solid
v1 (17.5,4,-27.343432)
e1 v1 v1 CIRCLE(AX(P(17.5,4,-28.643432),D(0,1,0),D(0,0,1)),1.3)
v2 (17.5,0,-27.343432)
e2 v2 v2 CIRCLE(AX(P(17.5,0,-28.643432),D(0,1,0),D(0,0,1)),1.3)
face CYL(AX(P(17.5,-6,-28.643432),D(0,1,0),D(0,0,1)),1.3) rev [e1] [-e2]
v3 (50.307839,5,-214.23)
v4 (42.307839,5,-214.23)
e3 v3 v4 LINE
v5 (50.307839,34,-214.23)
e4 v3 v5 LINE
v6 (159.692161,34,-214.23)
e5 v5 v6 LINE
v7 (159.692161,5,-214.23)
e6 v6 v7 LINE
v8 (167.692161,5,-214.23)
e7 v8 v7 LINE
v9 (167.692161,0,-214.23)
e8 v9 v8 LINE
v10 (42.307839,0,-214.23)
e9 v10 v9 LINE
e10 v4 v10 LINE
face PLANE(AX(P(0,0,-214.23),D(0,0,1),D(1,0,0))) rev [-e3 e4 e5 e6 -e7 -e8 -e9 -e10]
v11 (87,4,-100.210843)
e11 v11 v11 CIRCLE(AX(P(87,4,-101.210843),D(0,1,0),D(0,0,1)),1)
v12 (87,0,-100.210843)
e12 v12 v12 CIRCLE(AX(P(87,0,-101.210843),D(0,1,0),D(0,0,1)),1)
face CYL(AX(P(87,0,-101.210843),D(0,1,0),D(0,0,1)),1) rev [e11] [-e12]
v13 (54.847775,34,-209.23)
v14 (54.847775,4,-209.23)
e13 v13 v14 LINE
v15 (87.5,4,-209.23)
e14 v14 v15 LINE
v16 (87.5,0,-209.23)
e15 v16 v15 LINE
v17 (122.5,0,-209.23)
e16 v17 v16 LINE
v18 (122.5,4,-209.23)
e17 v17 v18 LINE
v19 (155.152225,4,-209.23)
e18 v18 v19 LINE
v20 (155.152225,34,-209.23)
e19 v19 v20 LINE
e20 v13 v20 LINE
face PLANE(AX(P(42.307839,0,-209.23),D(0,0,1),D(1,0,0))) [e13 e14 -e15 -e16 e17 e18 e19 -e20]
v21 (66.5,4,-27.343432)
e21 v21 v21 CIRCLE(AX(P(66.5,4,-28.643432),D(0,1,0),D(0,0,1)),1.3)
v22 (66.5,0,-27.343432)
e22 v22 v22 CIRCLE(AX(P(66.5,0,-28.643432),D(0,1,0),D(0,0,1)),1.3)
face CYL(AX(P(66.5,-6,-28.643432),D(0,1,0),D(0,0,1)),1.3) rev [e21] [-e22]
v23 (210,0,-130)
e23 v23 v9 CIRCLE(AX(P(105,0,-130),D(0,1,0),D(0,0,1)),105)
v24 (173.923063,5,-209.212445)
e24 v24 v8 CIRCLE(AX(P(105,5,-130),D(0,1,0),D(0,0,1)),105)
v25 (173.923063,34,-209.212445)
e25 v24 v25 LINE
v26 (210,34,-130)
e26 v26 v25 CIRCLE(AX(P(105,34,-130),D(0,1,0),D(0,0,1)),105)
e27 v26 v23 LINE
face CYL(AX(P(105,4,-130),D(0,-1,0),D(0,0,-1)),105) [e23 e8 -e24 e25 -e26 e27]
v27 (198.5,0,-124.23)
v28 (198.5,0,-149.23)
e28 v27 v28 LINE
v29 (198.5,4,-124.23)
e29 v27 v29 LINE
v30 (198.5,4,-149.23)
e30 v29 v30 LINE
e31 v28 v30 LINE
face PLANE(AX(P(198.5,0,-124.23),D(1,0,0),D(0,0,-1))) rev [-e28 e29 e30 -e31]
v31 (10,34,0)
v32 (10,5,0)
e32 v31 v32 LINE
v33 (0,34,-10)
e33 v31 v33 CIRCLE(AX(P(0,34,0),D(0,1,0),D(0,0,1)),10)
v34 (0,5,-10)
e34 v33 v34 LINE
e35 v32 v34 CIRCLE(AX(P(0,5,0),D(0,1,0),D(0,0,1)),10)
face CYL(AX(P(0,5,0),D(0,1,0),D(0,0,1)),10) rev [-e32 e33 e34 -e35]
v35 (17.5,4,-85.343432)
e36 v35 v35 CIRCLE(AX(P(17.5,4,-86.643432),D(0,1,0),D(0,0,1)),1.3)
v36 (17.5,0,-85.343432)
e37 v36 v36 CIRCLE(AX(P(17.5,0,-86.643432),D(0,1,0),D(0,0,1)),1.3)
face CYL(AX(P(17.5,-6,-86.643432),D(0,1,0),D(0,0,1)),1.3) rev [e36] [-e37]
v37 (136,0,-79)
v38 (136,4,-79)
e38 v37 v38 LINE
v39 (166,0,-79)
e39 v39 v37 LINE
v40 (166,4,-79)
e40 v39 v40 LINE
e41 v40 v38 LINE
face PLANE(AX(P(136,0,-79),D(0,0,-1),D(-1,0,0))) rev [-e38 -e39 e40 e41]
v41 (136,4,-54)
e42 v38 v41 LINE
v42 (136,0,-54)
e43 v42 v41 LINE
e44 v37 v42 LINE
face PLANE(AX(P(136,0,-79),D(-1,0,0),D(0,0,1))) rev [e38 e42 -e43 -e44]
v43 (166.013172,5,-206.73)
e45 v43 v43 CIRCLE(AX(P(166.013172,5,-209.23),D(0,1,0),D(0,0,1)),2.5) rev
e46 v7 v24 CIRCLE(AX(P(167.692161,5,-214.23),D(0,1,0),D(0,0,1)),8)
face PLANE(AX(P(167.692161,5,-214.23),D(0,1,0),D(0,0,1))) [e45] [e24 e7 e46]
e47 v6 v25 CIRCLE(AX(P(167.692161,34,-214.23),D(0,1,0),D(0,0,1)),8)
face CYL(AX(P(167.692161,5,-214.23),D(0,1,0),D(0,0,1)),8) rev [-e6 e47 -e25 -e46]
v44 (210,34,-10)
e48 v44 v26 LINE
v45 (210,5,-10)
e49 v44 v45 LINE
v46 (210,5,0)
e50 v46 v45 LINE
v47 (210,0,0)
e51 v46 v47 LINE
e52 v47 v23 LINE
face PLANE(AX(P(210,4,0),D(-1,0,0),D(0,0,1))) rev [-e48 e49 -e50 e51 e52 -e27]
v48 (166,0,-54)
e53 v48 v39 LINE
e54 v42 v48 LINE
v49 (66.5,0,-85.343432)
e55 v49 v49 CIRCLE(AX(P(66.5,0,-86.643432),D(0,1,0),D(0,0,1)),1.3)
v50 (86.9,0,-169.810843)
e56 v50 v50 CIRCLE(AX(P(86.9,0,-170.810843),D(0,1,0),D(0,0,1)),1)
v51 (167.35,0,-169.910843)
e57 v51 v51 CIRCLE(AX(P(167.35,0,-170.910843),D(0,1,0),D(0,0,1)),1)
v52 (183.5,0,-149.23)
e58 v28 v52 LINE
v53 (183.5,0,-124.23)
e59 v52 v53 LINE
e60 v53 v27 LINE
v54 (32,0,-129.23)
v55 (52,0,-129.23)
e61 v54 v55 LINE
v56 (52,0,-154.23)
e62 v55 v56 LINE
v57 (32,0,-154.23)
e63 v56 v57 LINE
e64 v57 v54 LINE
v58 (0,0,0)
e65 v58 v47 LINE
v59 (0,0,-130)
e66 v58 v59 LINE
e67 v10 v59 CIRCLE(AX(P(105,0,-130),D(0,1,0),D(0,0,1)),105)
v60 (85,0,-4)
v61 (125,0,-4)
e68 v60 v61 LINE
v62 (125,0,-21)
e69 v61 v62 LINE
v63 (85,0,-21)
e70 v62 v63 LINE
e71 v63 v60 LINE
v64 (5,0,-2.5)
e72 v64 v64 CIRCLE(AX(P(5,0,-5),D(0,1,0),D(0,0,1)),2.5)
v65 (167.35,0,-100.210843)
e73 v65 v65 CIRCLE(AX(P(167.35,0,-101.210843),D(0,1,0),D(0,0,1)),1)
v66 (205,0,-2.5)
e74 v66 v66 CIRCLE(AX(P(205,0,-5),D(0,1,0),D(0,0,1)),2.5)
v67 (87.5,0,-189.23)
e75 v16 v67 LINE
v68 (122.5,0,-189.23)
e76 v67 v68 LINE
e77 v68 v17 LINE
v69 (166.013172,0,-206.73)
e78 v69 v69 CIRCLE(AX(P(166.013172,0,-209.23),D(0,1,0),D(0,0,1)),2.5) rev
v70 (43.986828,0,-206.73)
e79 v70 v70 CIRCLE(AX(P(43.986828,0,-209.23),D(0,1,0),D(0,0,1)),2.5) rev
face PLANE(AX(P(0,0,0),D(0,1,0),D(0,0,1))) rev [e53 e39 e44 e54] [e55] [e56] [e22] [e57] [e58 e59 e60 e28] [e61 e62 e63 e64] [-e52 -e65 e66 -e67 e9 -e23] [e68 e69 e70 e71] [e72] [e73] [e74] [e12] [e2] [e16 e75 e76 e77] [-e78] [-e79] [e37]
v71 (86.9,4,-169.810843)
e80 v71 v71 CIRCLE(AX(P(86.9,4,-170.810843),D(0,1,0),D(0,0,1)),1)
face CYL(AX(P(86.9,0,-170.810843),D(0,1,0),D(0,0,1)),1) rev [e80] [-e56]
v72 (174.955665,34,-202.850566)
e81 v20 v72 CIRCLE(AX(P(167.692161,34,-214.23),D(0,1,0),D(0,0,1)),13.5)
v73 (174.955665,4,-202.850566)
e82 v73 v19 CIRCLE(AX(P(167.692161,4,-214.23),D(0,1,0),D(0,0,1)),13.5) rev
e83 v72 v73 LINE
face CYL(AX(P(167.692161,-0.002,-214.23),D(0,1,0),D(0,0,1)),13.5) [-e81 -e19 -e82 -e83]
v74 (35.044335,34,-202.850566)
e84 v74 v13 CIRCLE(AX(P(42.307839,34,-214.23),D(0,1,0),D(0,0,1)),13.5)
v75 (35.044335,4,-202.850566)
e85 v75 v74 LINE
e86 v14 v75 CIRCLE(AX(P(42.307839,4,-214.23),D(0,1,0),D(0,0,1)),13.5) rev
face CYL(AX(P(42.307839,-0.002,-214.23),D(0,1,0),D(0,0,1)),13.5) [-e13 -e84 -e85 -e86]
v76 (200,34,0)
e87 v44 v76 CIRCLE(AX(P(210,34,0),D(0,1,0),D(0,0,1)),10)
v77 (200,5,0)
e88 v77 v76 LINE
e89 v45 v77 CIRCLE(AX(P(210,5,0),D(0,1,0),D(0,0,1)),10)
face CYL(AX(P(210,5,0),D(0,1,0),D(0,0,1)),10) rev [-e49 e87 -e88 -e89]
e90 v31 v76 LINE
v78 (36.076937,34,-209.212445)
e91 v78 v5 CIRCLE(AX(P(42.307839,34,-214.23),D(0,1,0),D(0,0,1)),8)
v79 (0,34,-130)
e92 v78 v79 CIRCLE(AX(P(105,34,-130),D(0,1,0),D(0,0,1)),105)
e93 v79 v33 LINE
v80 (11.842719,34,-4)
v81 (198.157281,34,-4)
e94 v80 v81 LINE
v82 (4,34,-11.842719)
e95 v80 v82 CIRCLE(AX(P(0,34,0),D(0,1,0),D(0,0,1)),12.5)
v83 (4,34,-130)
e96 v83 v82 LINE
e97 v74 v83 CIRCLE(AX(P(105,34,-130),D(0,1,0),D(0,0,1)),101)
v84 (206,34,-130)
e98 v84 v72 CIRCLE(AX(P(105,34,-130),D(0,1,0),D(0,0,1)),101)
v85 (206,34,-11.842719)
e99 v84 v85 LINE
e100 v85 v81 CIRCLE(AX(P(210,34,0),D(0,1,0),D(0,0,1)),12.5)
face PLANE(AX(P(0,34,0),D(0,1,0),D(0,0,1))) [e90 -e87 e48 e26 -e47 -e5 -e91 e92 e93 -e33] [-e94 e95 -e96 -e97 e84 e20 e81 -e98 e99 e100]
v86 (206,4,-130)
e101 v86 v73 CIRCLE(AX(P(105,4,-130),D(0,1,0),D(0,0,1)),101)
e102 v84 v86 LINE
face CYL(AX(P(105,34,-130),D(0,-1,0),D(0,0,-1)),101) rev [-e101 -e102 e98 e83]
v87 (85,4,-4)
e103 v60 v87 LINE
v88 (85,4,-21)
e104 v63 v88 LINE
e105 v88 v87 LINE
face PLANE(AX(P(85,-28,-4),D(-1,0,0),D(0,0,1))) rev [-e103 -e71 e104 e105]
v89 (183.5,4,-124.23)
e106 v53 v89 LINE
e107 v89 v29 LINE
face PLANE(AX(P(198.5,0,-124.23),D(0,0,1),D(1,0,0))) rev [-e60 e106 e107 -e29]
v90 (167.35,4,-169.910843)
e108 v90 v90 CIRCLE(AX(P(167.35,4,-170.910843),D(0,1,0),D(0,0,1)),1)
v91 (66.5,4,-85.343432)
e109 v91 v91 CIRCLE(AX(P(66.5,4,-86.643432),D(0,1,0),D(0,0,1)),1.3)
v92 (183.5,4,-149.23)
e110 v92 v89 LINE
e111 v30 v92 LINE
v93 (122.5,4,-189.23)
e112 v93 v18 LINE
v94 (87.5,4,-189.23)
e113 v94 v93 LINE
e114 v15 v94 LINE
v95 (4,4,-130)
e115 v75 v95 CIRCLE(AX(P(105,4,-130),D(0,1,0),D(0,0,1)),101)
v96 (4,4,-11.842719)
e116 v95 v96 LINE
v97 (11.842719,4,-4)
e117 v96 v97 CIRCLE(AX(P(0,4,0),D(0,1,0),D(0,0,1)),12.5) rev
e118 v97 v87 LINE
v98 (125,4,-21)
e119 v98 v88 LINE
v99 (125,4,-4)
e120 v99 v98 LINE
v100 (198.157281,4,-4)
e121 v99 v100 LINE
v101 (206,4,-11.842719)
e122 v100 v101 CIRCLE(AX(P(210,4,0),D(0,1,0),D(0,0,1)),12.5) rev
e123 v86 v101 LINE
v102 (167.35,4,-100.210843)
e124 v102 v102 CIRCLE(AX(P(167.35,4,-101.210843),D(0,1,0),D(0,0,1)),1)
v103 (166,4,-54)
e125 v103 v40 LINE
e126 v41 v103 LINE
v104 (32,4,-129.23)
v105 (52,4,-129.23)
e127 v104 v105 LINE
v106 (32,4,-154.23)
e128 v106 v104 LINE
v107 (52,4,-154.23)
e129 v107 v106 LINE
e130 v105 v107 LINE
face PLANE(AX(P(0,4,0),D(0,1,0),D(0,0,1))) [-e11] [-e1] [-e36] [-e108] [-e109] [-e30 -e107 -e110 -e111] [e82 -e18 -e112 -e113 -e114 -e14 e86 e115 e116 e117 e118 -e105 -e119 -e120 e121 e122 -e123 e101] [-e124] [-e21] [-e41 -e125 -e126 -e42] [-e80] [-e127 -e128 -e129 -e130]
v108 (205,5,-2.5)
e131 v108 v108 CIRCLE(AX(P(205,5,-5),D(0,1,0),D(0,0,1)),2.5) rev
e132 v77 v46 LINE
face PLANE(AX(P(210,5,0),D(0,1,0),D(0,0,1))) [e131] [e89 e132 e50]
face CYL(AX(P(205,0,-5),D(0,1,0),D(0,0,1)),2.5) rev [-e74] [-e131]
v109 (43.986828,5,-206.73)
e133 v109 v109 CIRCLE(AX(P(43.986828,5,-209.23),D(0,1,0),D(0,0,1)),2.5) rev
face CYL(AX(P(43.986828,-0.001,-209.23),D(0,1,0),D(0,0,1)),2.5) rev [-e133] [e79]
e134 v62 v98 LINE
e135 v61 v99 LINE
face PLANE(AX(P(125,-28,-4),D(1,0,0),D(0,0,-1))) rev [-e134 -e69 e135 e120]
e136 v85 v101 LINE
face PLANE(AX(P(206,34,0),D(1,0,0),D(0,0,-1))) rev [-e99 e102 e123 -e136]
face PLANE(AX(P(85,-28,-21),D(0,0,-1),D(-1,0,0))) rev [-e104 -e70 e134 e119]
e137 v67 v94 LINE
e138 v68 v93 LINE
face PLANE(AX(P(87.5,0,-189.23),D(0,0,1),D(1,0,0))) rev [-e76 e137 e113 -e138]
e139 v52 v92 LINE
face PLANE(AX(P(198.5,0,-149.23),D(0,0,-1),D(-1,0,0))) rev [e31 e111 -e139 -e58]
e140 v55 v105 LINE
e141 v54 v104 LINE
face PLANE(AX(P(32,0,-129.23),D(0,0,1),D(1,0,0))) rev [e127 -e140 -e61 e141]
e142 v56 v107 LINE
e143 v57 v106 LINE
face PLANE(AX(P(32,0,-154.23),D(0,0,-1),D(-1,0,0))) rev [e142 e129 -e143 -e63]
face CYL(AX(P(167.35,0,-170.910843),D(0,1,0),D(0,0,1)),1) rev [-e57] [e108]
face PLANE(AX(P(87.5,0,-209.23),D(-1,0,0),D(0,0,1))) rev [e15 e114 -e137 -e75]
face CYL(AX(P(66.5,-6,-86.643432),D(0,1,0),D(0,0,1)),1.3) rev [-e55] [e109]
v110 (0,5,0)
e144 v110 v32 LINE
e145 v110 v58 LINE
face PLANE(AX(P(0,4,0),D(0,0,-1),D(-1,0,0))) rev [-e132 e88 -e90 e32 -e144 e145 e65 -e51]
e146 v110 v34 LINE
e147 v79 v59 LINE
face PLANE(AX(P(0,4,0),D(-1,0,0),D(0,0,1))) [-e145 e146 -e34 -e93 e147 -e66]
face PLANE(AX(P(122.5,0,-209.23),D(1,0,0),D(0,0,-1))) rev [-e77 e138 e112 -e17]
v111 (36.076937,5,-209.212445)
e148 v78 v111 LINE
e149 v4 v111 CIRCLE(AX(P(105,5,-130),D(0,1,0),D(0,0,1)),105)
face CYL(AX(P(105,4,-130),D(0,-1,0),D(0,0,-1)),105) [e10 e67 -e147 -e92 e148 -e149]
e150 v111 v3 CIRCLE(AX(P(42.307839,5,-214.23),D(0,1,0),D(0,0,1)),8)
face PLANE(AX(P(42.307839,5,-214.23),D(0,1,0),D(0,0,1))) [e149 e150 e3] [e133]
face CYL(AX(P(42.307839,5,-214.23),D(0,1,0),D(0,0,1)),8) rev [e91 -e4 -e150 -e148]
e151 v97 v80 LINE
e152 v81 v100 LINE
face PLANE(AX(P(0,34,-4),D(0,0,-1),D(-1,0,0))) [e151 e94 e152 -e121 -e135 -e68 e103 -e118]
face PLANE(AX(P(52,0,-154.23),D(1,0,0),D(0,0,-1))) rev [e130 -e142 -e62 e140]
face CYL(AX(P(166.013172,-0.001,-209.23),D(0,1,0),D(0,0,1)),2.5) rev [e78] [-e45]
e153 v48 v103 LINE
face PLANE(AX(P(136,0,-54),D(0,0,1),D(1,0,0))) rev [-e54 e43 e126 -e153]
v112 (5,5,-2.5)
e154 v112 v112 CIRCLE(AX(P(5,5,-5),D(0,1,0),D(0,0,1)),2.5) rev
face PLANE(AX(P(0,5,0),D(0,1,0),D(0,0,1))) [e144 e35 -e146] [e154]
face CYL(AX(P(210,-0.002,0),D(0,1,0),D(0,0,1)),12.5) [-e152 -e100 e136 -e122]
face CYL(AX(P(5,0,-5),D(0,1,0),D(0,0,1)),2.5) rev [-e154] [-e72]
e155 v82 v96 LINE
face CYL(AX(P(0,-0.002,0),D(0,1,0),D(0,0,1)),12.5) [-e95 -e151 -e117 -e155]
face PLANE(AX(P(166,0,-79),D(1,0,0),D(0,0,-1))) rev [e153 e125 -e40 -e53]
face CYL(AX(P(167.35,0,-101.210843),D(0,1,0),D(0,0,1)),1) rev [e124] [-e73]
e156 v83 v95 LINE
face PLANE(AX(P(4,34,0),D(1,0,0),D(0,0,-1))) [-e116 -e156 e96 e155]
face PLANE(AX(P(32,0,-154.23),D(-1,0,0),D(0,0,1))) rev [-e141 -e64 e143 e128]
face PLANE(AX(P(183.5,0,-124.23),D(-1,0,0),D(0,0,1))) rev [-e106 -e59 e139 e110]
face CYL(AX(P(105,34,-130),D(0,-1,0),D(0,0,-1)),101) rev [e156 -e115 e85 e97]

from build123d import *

# Parameters (mm, degrees)
BOSS_EXTRUDE1_DEPTH = 4
BOSS_EXTRUDE2_DEPTH = 30
SKETCH3_W           = 218.358496247
SKETCH3_H           = 47.347449782
CUT_EXTRUDE1_DEPTH  = 317.987381452
BOSS_EXTRUDE3_START = -30
BOSS_EXTRUDE3_DEPTH = 30
BOSS_EXTRUDE4_START = -30
BOSS_EXTRUDE4_DEPTH = 30
CUT_EXTRUDE2_REACH  = 303.911
SKETCH6_R           = 2.5
SKETCH7_R           = 8
CUT_EXTRUDE3_DEPTH  = 29
BOSS_EXTRUDE5_START = -30
BOSS_EXTRUDE5_DEPTH = 30
SKETCH9_R           = 2.5
CUT_EXTRUDE4_DEPTH  = 302.911399089
SKETCH10_R          = 10
CUT_EXTRUDE5_DEPTH  = 29
SKETCH11_W          = 40
SKETCH11_H          = 17
CUT_EXTRUDE6_DEPTH  = 32
SKETCH14_R          = 1.3
CUT_EXTRUDE9_DEPTH  = 10
SKETCH12_R          = 1
CUT_EXTRUDE10_DEPTH = 302.487135546
SKETCH16_W          = 35
SKETCH16_H          = 20
SKETCH16_W_2        = 20
SKETCH16_H_2        = 25
SKETCH16_W_3        = 30
SKETCH16_W_4        = 15
CUT_EXTRUDE11_DEPTH = 302.487135546


# Read off the part's stored shape, not the designer's step: Boss-Extrude3, Boss-Extrude4, Boss-Extrude5
with BuildPart() as part:
    # Sketch1 → Boss-Extrude1 (new body)
    with BuildSketch(Plane(origin=(0, 0, 0), x_dir=(1, 0, 0), z_dir=(0, 1, 0))):
        with BuildLine():
            ThreePointArc((210, 130), (105, 235), (0, 130))
            Line((0, 130), (210, 130))
        make_face()
        with BuildLine():
            Line((210, 130), (0, 130))
            ThreePointArc((0, 130), (105, 25), (210, 130))
        make_face()
        with BuildLine():
            Line((0, 130), (0, 0))
            Line((0, 0), (210, 0))
            Line((210, 0), (210, 130))
            ThreePointArc((210, 130), (105, 25), (0, 130))
        make_face()
    extrude(amount=BOSS_EXTRUDE1_DEPTH)

    # Sketch2 → Boss-Extrude2 (add)
    with BuildSketch(Plane(origin=(0, 4, 0), x_dir=(1, 0, 0), z_dir=(0, 1, 0))):
        with BuildLine():
            Line((210, 0), (210, 130))
            ThreePointArc((210, 130), (105, 235), (0, 130))
            Line((0, 130), (0, 0))
            Line((0, 0), (210, 0))
        make_face()
        with BuildLine():
            ThreePointArc((4, 130), (105, 231), (206, 130))
            Line((206, 130), (206, 4))
            Line((206, 4), (4, 4))
            Line((4, 4), (4, 130))
        make_face(mode=Mode.SUBTRACT)
    extrude(amount=BOSS_EXTRUDE2_DEPTH)

    # Sketch3 → Cut-Extrude1 (cut, through all)
    with BuildSketch(Plane(origin=(0, 34, 0), x_dir=(1, 0, 0), z_dir=(0, 1, 0))):
        with Locations((109.179248124, 237.903724891)):
            Rectangle(SKETCH3_W, SKETCH3_H)
    extrude(amount=-CUT_EXTRUDE1_DEPTH, mode=Mode.SUBTRACT)

    # Boss-Extrude3 outline → Boss-Extrude3 (add)
    with BuildSketch(Plane(origin=(0, 34, 0), x_dir=(1, 0, 0), z_dir=(0, 1, 0)).offset(BOSS_EXTRUDE3_START)):
        with BuildLine():
            Line((160.734254279, 214.23), (49.265745721, 214.23))
            ThreePointArc((49.265745721, 214.23), (45.760745723, 211.802877411), (42.361297108, 209.23))
            Line((42.361297108, 209.23), (167.638702892, 209.23))
            ThreePointArc((167.638702892, 209.23), (164.239254277, 211.802877411), (160.734254279, 214.23))
        make_face()
    extrude(amount=BOSS_EXTRUDE3_DEPTH)

    # Boss-Extrude4 outline → Boss-Extrude4 (add)
    with BuildSketch(Plane(origin=(0, 34, 0), x_dir=(1, 0, 0), z_dir=(0, 1, 0)).offset(BOSS_EXTRUDE4_START)):
        with BuildLine():
            ThreePointArc((42.361297108, 209.23), (38.626128036, 206.128241281), (35.044335216, 202.850565986))
            ThreePointArc((35.044335216, 202.850565986), (46.447220251, 201.380271613), (54.847774812, 209.23))
            Line((54.847774812, 209.23), (42.361297108, 209.23))
        make_face()
        with BuildLine():
            Line((167.638702892, 209.23), (155.152225188, 209.23))
            ThreePointArc((155.152225188, 209.23), (163.552779749, 201.380271613), (174.955664785, 202.850565987))
            ThreePointArc((174.955664785, 202.850565987), (171.373871964, 206.128241281), (167.638702892, 209.23))
        make_face()
    extrude(amount=BOSS_EXTRUDE4_DEPTH)

    # Sketch6 → Cut-Extrude2 (cut, up to next)
    with BuildSketch(Plane(origin=(0, 34, 0), x_dir=(1, 0, 0), z_dir=(0, 1, 0)), mode=Mode.PRIVATE) as cut_extrude2_sk1:
        with Locations(Location((43.986828471, 209.23, 0), (0, 0, 270))):
            Circle(SKETCH6_R)
    cut_extrude2_tool1 = extrude(cut_extrude2_sk1.sketch, amount=-CUT_EXTRUDE2_REACH, mode=Mode.PRIVATE) & part.part
    # Sketch6 → Cut-Extrude2 (cut, up to next)
    with BuildSketch(Plane(origin=(0, 34, 0), x_dir=(1, 0, 0), z_dir=(0, 1, 0)), mode=Mode.PRIVATE) as cut_extrude2_sk2:
        with Locations(Location((166.013171529, 209.23, 0), (0, 0, 270))):
            Circle(SKETCH6_R)
    cut_extrude2_tool2 = extrude(cut_extrude2_sk2.sketch, amount=-CUT_EXTRUDE2_REACH, mode=Mode.PRIVATE) & part.part
    add(cut_extrude2_tool1.solids().sort_by_distance((43.986828, 34, -209.23))[0], mode=Mode.SUBTRACT)
    add(cut_extrude2_tool2.solids().sort_by_distance((166.013172, 34, -209.23))[0], mode=Mode.SUBTRACT)

    # Sketch7 → Cut-Extrude3 (cut)
    with BuildSketch(Plane(origin=(0, 34, 0), x_dir=(1, 0, 0), z_dir=(0, 1, 0))):
        with Locations((42.307838608, 214.23)):
            Circle(SKETCH7_R)
        with Locations((167.692161392, 214.23)):
            Circle(SKETCH7_R)
    extrude(amount=-CUT_EXTRUDE3_DEPTH, mode=Mode.SUBTRACT)

    # Boss-Extrude5 outline → Boss-Extrude5 (add)
    with BuildSketch(Plane(origin=(0, 34, 0), x_dir=(1, 0, 0), z_dir=(0, 1, 0)).offset(BOSS_EXTRUDE5_START)):
        with BuildLine():
            Line((4, 4), (11.842719282, 4))
            ThreePointArc((11.842719282, 4), (8.838834765, 8.838834765), (4, 11.842719282))
            Line((4, 11.842719282), (4, 4))
        make_face()
        with BuildLine():
            ThreePointArc((206, 11.842719282), (201.161165235, 8.838834765), (198.157280718, 4))
            Line((198.157280718, 4), (206, 4))
            Line((206, 4), (206, 11.842719282))
        make_face()
    extrude(amount=BOSS_EXTRUDE5_DEPTH)

    # Sketch9 → Cut-Extrude4 (cut, through all)
    with BuildSketch(Plane(origin=(0, 34, 0), x_dir=(1, 0, 0), z_dir=(0, 1, 0))):
        with Locations(Location((5, 5, 0), (0, 0, 270))):
            Circle(SKETCH9_R)
        with Locations(Location((205, 5, 0), (0, 0, 270))):
            Circle(SKETCH9_R)
    extrude(amount=-CUT_EXTRUDE4_DEPTH, mode=Mode.SUBTRACT)

    # Sketch10 → Cut-Extrude5 (cut)
    with BuildSketch(Plane(origin=(0, 34, 0), x_dir=(1, 0, 0), z_dir=(0, 1, 0))):
        Circle(SKETCH10_R)
        with Locations((210, 0)):
            Circle(SKETCH10_R)
    extrude(amount=-CUT_EXTRUDE5_DEPTH, mode=Mode.SUBTRACT)

    # Sketch11 → Cut-Extrude6 (cut)
    with BuildSketch(Plane(origin=(0, 4, 0), x_dir=(1, 0, 0), z_dir=(0, 1, 0))):
        with Locations((105, 12.5)):
            Rectangle(SKETCH11_W, SKETCH11_H)
    extrude(amount=-CUT_EXTRUDE6_DEPTH, mode=Mode.SUBTRACT)

    # Sketch14 → Cut-Extrude9 (cut)
    with BuildSketch(Plane(origin=(0, 4, 0), x_dir=(1, 0, 0), z_dir=(0, 1, 0))):
        with Locations(Location((17.5, 86.643431732, 0), (0, 0, 270))):
            Circle(SKETCH14_R)
        with Locations(Location((66.5, 86.643431732, 0), (0, 0, 270))):
            Circle(SKETCH14_R)
        with Locations(Location((17.5, 28.643431732, 0), (0, 0, 270))):
            Circle(SKETCH14_R)
        with Locations(Location((66.5, 28.643431732, 0), (0, 0, 270))):
            Circle(SKETCH14_R)
    extrude(amount=-CUT_EXTRUDE9_DEPTH, mode=Mode.SUBTRACT)

    # Sketch12 → Cut-Extrude10 (cut, through all)
    with BuildSketch(Plane(origin=(0, 4, 0), x_dir=(1, 0, 0), z_dir=(0, 1, 0))):
        with Locations(Location((86.9, 170.810842956, 0), (0, 0, 270))):
            Circle(SKETCH12_R)
        with Locations(Location((167.35, 101.210842956, 0), (0, 0, 270))):
            Circle(SKETCH12_R)
        with Locations(Location((167.35, 170.910842956, 0), (0, 0, 270))):
            Circle(SKETCH12_R)
        with Locations(Location((87, 101.210842956, 0), (0, 0, 270))):
            Circle(SKETCH12_R)
    extrude(amount=-CUT_EXTRUDE10_DEPTH, mode=Mode.SUBTRACT)

    # Sketch16 → Cut-Extrude11 (cut, through all)
    with BuildSketch(Plane(origin=(0, 4, 0), x_dir=(1, 0, 0), z_dir=(0, 1, 0))):
        with Locations((105, 199.23)):
            Rectangle(SKETCH16_W, SKETCH16_H)
        with Locations((42, 141.73)):
            Rectangle(SKETCH16_W_2, SKETCH16_H_2)
        with Locations((151, 66.5)):
            Rectangle(SKETCH16_W_3, SKETCH16_H_2)
        with Locations((191, 136.73)):
            Rectangle(SKETCH16_W_4, SKETCH16_H_2)
    extrude(amount=-CUT_EXTRUDE11_DEPTH, mode=Mode.SUBTRACT)


solid = part.part
